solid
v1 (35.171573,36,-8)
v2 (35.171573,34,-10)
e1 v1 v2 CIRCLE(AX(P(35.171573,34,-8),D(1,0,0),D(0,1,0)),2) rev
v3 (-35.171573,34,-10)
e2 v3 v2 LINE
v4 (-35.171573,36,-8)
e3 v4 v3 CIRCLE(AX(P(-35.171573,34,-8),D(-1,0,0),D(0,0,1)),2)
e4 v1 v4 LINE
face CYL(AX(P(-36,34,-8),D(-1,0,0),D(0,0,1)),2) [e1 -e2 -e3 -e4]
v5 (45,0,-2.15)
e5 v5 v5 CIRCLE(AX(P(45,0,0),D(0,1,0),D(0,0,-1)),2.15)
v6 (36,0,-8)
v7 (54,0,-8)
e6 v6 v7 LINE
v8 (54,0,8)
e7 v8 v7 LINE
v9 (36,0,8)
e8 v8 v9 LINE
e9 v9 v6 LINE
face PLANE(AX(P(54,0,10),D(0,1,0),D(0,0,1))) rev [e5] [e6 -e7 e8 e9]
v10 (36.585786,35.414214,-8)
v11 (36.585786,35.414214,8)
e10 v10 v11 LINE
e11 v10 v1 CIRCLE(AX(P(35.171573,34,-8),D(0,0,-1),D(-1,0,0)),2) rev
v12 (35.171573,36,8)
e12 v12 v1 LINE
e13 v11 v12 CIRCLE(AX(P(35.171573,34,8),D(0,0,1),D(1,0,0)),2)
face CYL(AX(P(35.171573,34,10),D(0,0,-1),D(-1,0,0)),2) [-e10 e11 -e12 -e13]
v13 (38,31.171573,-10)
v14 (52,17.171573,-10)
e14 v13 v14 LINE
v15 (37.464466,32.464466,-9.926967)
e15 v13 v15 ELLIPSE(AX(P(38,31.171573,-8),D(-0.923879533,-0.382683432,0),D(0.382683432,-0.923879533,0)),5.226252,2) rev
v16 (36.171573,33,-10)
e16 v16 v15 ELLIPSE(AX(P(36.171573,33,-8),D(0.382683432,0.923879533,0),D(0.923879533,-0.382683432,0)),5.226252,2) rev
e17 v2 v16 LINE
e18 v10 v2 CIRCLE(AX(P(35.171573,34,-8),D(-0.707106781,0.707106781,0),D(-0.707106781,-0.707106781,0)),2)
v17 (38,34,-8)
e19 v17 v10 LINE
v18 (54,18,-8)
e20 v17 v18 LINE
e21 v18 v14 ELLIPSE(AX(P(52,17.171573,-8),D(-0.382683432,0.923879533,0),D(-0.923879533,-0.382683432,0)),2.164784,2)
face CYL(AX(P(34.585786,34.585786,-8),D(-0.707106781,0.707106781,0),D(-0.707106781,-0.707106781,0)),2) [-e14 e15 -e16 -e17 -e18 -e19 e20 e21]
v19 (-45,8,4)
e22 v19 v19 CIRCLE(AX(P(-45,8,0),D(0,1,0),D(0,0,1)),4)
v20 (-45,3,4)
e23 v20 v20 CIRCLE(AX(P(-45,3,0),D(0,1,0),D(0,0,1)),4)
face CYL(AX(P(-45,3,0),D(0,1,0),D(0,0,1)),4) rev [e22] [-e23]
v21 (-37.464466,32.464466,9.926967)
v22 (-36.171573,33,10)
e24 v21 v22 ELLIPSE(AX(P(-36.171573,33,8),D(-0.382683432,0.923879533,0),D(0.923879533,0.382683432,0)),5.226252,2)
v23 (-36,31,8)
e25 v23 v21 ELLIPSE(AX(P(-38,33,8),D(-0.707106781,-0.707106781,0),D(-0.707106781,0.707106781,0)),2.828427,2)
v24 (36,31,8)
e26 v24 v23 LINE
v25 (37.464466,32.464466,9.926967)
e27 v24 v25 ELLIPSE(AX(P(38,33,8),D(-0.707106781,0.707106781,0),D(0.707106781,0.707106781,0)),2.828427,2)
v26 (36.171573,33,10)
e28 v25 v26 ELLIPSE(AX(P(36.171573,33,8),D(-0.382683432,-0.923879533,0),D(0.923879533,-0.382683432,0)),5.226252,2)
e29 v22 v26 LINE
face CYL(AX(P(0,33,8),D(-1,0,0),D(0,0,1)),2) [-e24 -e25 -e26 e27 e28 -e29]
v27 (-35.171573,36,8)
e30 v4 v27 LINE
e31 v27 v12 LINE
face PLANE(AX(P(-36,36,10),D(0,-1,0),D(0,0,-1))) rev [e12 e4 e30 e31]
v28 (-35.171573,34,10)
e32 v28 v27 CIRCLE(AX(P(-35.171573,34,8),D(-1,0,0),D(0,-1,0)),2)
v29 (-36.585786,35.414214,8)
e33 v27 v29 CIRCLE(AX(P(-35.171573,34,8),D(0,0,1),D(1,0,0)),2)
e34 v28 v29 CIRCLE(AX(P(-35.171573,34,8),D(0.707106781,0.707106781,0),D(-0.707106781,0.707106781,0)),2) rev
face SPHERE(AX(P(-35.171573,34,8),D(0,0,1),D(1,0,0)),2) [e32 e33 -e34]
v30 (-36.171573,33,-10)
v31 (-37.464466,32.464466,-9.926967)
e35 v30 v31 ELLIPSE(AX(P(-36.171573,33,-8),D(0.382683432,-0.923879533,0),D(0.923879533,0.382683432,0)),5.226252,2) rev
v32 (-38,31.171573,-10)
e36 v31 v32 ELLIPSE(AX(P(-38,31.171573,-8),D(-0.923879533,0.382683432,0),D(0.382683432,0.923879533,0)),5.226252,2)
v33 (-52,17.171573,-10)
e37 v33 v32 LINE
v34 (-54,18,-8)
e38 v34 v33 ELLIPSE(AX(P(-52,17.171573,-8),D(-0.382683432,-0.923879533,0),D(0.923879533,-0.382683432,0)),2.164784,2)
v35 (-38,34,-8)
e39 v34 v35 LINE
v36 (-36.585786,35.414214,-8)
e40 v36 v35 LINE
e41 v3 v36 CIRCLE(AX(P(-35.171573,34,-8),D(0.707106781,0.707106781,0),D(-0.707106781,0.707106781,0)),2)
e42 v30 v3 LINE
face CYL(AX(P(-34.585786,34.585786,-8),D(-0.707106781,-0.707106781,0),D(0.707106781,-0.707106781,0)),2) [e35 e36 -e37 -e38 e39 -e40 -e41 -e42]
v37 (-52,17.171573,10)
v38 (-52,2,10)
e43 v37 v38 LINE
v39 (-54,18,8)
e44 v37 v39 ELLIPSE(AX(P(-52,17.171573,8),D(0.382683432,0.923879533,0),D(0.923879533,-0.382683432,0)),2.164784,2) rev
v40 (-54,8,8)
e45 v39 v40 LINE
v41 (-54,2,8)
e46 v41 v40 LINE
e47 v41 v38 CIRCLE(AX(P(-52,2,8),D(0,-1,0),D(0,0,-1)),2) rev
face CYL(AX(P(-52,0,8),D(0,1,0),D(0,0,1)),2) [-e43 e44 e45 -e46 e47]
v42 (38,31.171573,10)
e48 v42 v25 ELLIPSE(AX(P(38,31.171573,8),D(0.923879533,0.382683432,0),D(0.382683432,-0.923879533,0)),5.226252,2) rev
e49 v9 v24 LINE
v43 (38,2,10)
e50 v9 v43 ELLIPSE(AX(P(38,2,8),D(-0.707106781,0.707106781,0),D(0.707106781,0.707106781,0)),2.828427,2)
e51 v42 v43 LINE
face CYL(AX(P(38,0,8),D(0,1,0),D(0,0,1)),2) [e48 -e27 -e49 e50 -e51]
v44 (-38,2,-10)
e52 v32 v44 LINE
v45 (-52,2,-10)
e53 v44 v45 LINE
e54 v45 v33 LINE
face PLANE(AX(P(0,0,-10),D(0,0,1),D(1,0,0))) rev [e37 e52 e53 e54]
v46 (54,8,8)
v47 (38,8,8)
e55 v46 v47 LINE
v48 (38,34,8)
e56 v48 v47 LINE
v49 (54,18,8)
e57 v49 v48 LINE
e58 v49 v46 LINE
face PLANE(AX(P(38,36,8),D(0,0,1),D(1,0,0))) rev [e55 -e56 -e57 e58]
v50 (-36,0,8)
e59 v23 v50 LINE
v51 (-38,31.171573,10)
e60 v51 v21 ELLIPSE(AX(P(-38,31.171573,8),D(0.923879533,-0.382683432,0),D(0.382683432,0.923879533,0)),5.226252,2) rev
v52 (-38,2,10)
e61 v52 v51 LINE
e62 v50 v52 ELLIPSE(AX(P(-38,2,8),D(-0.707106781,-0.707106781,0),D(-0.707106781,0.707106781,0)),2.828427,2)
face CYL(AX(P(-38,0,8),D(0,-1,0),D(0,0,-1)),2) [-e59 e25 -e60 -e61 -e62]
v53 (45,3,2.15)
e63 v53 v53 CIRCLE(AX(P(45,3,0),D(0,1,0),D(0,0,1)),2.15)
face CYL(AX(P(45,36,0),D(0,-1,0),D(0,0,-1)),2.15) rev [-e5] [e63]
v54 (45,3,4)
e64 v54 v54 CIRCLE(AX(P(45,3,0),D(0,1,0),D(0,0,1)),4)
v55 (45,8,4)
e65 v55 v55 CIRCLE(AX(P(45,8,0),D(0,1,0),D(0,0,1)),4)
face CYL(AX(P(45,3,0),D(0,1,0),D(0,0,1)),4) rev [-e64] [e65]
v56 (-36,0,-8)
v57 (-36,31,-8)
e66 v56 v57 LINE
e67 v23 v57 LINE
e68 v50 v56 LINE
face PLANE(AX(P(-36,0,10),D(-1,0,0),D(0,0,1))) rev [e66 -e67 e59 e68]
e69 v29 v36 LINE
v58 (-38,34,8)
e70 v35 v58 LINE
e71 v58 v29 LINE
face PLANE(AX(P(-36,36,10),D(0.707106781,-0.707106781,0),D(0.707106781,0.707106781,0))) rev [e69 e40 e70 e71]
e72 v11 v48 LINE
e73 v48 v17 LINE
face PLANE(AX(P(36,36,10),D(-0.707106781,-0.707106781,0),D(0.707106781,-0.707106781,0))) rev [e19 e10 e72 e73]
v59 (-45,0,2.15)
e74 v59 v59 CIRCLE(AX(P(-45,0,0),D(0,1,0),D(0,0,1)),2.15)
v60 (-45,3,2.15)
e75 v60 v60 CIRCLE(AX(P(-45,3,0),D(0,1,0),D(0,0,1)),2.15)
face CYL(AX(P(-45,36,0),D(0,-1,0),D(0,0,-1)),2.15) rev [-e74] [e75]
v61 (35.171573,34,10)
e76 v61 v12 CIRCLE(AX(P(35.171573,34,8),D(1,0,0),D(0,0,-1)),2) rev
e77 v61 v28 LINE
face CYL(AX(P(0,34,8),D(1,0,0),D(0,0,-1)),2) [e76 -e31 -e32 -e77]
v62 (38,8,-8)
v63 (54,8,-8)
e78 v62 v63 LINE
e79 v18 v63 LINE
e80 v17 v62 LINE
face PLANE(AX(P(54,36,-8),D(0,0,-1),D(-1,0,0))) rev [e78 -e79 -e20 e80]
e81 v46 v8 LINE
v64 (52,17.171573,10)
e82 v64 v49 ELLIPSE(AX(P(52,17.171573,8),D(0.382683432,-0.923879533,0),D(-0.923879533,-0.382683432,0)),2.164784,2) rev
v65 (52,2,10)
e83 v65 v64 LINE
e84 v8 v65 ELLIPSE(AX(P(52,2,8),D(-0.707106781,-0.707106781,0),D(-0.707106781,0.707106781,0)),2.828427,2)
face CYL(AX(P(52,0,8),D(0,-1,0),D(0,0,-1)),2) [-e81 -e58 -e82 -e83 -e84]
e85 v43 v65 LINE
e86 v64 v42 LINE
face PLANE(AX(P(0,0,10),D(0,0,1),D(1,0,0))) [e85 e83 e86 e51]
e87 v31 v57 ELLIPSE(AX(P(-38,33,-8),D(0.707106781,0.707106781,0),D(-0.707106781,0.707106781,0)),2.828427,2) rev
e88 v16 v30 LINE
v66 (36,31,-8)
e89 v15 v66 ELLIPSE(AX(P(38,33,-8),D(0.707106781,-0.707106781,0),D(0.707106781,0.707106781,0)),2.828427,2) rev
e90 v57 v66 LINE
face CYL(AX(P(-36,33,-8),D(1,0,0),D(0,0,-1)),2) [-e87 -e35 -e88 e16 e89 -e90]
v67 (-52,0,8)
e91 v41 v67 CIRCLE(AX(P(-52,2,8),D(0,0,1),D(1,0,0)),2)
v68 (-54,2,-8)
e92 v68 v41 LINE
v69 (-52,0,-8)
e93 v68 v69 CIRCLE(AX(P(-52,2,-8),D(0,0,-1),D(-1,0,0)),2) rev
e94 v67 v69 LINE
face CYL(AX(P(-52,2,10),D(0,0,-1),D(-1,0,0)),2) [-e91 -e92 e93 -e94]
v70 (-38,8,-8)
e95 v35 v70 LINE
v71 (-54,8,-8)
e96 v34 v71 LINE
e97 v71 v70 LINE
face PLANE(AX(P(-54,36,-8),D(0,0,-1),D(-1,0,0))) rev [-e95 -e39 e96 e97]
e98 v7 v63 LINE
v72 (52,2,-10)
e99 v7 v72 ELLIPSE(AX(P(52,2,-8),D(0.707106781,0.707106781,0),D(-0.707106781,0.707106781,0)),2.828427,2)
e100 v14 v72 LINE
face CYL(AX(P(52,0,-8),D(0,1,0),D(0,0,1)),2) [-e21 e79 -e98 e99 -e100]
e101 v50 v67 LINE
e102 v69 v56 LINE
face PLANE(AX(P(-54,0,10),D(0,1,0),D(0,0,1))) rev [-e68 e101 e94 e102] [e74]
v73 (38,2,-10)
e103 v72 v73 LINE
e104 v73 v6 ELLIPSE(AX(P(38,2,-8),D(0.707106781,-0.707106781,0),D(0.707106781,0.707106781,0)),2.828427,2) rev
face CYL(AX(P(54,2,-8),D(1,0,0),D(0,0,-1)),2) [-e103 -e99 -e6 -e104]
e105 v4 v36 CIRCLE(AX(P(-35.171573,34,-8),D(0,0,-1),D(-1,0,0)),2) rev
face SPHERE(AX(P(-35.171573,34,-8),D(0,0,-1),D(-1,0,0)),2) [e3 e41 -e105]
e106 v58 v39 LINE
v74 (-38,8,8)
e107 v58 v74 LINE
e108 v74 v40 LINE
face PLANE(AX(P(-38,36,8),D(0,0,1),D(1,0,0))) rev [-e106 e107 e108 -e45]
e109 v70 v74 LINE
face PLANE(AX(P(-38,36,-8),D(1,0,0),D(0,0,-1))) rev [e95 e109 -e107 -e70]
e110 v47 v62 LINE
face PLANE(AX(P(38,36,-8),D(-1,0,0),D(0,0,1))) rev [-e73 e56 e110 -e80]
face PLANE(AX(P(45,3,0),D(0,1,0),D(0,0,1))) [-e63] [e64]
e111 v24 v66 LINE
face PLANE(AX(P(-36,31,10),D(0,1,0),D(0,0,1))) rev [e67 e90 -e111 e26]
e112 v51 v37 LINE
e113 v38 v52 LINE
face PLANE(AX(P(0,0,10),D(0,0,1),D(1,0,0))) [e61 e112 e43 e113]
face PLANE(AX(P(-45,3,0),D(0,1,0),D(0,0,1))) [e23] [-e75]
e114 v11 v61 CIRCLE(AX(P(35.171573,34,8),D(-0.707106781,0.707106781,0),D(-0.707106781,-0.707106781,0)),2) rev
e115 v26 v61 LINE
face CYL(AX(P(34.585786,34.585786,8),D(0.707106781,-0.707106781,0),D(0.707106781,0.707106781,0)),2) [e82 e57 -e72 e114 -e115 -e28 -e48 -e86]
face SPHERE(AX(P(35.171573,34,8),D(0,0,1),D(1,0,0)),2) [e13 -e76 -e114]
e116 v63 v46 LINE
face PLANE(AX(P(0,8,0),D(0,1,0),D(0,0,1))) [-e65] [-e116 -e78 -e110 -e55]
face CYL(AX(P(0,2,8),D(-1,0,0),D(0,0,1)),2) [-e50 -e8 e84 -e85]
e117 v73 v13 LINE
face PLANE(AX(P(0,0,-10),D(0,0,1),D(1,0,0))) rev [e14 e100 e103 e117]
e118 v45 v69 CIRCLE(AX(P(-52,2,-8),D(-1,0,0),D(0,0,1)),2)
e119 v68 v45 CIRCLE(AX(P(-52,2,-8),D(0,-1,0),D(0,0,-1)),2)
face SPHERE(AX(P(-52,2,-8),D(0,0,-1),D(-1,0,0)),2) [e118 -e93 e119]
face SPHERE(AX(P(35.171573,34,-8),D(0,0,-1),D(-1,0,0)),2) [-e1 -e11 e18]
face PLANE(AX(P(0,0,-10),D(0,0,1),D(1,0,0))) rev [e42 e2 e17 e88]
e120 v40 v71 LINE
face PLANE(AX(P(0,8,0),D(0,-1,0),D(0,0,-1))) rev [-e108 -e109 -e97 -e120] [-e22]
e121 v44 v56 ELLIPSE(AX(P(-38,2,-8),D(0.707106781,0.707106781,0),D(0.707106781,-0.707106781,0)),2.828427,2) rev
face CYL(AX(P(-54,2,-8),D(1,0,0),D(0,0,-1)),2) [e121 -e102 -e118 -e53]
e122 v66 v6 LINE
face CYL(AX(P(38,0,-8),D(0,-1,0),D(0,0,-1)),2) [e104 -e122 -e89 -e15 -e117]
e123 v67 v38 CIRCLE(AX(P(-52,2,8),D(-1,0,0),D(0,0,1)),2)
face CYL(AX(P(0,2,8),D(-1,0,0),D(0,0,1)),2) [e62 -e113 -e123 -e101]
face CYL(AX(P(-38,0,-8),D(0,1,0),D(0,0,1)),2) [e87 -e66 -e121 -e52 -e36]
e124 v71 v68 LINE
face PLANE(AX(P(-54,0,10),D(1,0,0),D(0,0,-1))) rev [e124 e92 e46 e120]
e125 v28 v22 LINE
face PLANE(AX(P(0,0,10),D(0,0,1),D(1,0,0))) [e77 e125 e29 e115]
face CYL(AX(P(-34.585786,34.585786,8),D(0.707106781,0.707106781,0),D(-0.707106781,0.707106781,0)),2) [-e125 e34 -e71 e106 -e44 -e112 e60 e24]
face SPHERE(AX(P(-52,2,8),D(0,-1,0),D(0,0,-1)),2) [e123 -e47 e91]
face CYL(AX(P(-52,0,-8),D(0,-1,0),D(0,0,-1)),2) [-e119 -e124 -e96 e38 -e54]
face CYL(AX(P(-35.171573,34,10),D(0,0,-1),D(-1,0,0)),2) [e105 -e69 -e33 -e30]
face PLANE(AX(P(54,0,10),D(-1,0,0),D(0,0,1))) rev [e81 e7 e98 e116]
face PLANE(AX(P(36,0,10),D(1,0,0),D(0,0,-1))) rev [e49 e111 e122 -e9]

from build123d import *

# Parameters (mm, degrees)
EXTRUDE_1_DEPTH     = 10
SKETCH_2_R          = 2.15
CUT_EXTRUDE_1_DEPTH = 66.665820638
CUT_EXTRUDE_START   = -8
SKETCH_3_W          = 16
SKETCH_3_H          = 16
CUT_EXTRUDE_2_DEPTH = 58.665820638
SKETCH_4_R          = 4
CUT_EXTRUDE_3_DEPTH = 5
FILLET_1_R          = 2


with BuildPart() as part:
    # 草图1 → 凸台-拉伸1 (new, symmetric)
    with BuildSketch(Plane.XY):
        Polygon((-54, 0), (-54, 18), (-36, 36), (36, 36), (54, 18), (54, 0), (36, 0), (36, 31), (-36, 31), (-36, 0), align=None)
    extrude(amount=EXTRUDE_1_DEPTH, both=True)

    # 草图2 → 切除-拉伸1 (cut, through all)
    with BuildSketch(Plane(origin=(0, 0, 0), x_dir=(1, 0, 0), z_dir=(0, 1, 0))):
        with Locations(Location((-45, 0, 0), (0, 0, 180))):
            Circle(SKETCH_2_R)
        with Locations(Location((45, 0, 0), (0, 0, 90))):
            Circle(SKETCH_2_R)
    extrude(amount=CUT_EXTRUDE_1_DEPTH, mode=Mode.SUBTRACT)

    # 草图3 → 切除-拉伸2 (cut, through all)
    with BuildSketch(Plane.XZ.offset(CUT_EXTRUDE_START)):
        with Locations((-46, 0)):
            Rectangle(SKETCH_3_W, SKETCH_3_H)
        with Locations((46, 0)):
            Rectangle(SKETCH_3_W, SKETCH_3_H)
    extrude(amount=-CUT_EXTRUDE_2_DEPTH, mode=Mode.SUBTRACT)

    # 草图4 → 切除-拉伸3 (cut)
    with BuildSketch(Plane(origin=(0, 8, 0), x_dir=(1, 0, 0), z_dir=(0, 1, 0))):
        with Locations(Location((45, 0, 0), (0, 0, 270))):
            Circle(SKETCH_4_R)
        with Locations(Location((-45, 0, 0), (0, 0, 270))):
            Circle(SKETCH_4_R)
    extrude(amount=-CUT_EXTRUDE_3_DEPTH, mode=Mode.SUBTRACT)

    # 圆角1
    # the kernel refuses this fillet: 2 mm, written as the material it takes off along each edge
    with BuildSketch(Plane(origin=(-52, 2, 8), x_dir=(0, -1, 0), z_dir=(-1, 0, 0))) as fillet_1_piece_1_section:
        Polygon((0, 0), (FILLET_1_R, 0), (FILLET_1_R, FILLET_1_R), (0, FILLET_1_R), align=None)
    fillet_1_piece_1 = extrude(amount=FILLET_1_R, mode=Mode.PRIVATE)
    fillet_1_piece_1 = fillet_1_piece_1 - Plane(origin=(-52, 2, 8), x_dir=(0, 0.7071067811865475, -0.7071067811865475), z_dir=(-1, 0, 0)) * Sphere(FILLET_1_R, mode=Mode.PRIVATE)
    add(fillet_1_piece_1, mode=Mode.SUBTRACT)
    with BuildSketch(Plane(origin=(-35.171572875, 34, 8), x_dir=(-0.7071067811865515, 0.7071067811865437, 0), z_dir=(0, 0, 1))) as fillet_1_piece_2_section:
        Polygon((0, 0), (FILLET_1_R, 0), (FILLET_1_R, -FILLET_1_R * 0.414213562373), (FILLET_1_R * 0.707106781187, -FILLET_1_R * 0.707106781187), align=None)
    fillet_1_piece_2 = extrude(amount=FILLET_1_R, mode=Mode.PRIVATE)
    fillet_1_piece_2 = fillet_1_piece_2 - Plane(origin=(-35.171572875, 34, 8), x_dir=(0.38268343236509234, -0.9238795325112857, 0), z_dir=(0, 0, 1)) * Sphere(FILLET_1_R, mode=Mode.PRIVATE)
    add(fillet_1_piece_2, mode=Mode.SUBTRACT)
    with BuildSketch(Plane(origin=(35.171572875, 34, 8), x_dir=(0.7071067811865515, 0.7071067811865437, 0), z_dir=(0, 0, 1))) as fillet_1_piece_3_section:
        Polygon((0, 0), (FILLET_1_R, 0), (FILLET_1_R, FILLET_1_R * 0.414213562373), (FILLET_1_R * 0.707106781187, FILLET_1_R * 0.707106781187), align=None)
    fillet_1_piece_3 = extrude(amount=FILLET_1_R, mode=Mode.PRIVATE)
    fillet_1_piece_3 = fillet_1_piece_3 - Plane(origin=(35.171572875, 34, 8), x_dir=(-0.38268343236509234, -0.9238795325112857, 0), z_dir=(0, 0, 1)) * Sphere(FILLET_1_R, mode=Mode.PRIVATE)
    add(fillet_1_piece_3, mode=Mode.SUBTRACT)
    with BuildSketch(Plane(origin=(35.171572875, 34, -8), x_dir=(0, 1, 0), z_dir=(0, 0, -1))) as fillet_1_piece_4_section:
        Polygon((0, 0), (FILLET_1_R, 0), (FILLET_1_R, FILLET_1_R * 0.414213562373), (FILLET_1_R * 0.707106781187, FILLET_1_R * 0.707106781187), align=None)
    fillet_1_piece_4 = extrude(amount=FILLET_1_R, mode=Mode.PRIVATE)
    fillet_1_piece_4 = fillet_1_piece_4 - Plane(origin=(35.171572875, 34, -8), x_dir=(-0.38268343236509234, -0.9238795325112857, 0), z_dir=(0, 0, -1)) * Sphere(FILLET_1_R, mode=Mode.PRIVATE)
    add(fillet_1_piece_4, mode=Mode.SUBTRACT)
    with BuildSketch(Plane(origin=(-35.171572875, 34, -8), x_dir=(0, 1, 0), z_dir=(0, 0, -1))) as fillet_1_piece_5_section:
        Polygon((0, 0), (FILLET_1_R, 0), (FILLET_1_R, -FILLET_1_R * 0.414213562373), (FILLET_1_R * 0.707106781187, -FILLET_1_R * 0.707106781187), align=None)
    fillet_1_piece_5 = extrude(amount=FILLET_1_R, mode=Mode.PRIVATE)
    fillet_1_piece_5 = fillet_1_piece_5 - Plane(origin=(-35.171572875, 34, -8), x_dir=(0.38268343236509234, -0.9238795325112857, 0), z_dir=(0, 0, -1)) * Sphere(FILLET_1_R, mode=Mode.PRIVATE)
    add(fillet_1_piece_5, mode=Mode.SUBTRACT)
    with BuildSketch(Plane(origin=(-52, 2, -8), x_dir=(0, -1, 0), z_dir=(-1, 0, 0))) as fillet_1_piece_6_section:
        Polygon((0, 0), (FILLET_1_R, 0), (FILLET_1_R, -FILLET_1_R), (0, -FILLET_1_R), align=None)
    fillet_1_piece_6 = extrude(amount=FILLET_1_R, mode=Mode.PRIVATE)
    fillet_1_piece_6 = fillet_1_piece_6 - Plane(origin=(-52, 2, -8), x_dir=(0, 0.7071067811865475, 0.7071067811865475), z_dir=(-1, 0, 0)) * Sphere(FILLET_1_R, mode=Mode.PRIVATE)
    add(fillet_1_piece_6, mode=Mode.SUBTRACT)
    with BuildSketch(Plane(origin=(-54, 2, 10), x_dir=(0, 0, -1), z_dir=(0, 1, 0)), Plane(origin=(-31, 0, 10), x_dir=(0, 0, -1), z_dir=(-1, 0, 0))) as fillet_1_piece_7:
        with BuildLine():
            CenterArc((FILLET_1_R, -FILLET_1_R), FILLET_1_R, 90, 90)
            Line((0, -FILLET_1_R), (0, 0))
            Line((0, 0), (FILLET_1_R, 0))
        make_face()
    extrude(amount=21, mode=Mode.SUBTRACT)
    with BuildSketch(Plane(origin=(-57.535533906, 14.464466094, 10), x_dir=(0.7071067811865515, -0.7071067811865437, 0), z_dir=(0.7071067811865437, 0.7071067811865515, 0)), Plane(origin=(36.585786438, 35.414213562, 10), x_dir=(-0.7071067811865515, -0.7071067811865437, 0), z_dir=(0.7071067811865437, -0.7071067811865515, 0)), Plane(origin=(-57.535533906, 14.464466094, -10), x_dir=(0, 0, 1), z_dir=(0.7071067811865437, 0.7071067811865515, 0))) as fillet_1_piece_8:
        with BuildLine():
            CenterArc((FILLET_1_R, FILLET_1_R), FILLET_1_R, 180, 90)
            Line((0, FILLET_1_R), (0, 0))
            Line((0, 0), (FILLET_1_R, 0))
        make_face()
    extrude(amount=29.627416998, mode=Mode.SUBTRACT)
    with BuildSketch(Plane(origin=(54, 23, 10), x_dir=(-1, 0, 0), z_dir=(0, -1, 0)), Plane(origin=(59, 0, 10), x_dir=(0, 1, 0), z_dir=(-1, 0, 0))) as fillet_1_piece_9:
        with BuildLine():
            CenterArc((FILLET_1_R, FILLET_1_R), FILLET_1_R, 180, 90)
            Line((0, FILLET_1_R), (0, 0))
            Line((0, 0), (FILLET_1_R, 0))
        make_face()
    extrude(amount=28, mode=Mode.SUBTRACT)
    with BuildSketch(Plane(origin=(36, -5, 10), x_dir=(1, 0, 0), z_dir=(0, 1, 0)), Plane(origin=(-36, 31, 10), x_dir=(-1, 0, 0), z_dir=(0, -1, 0))) as fillet_1_piece_10:
        with BuildLine():
            CenterArc((FILLET_1_R, FILLET_1_R), FILLET_1_R, 180, 90)
            Line((0, FILLET_1_R), (0, 0))
            Line((0, 0), (FILLET_1_R, 0))
        make_face()
    extrude(amount=36, mode=Mode.SUBTRACT)
    with BuildSketch(Plane(origin=(36, 31, 10), x_dir=(0, 1, 0), z_dir=(-1, 0, 0))) as fillet_1_piece_11:
        with BuildLine():
            CenterArc((FILLET_1_R, FILLET_1_R), FILLET_1_R, 180, 90)
            Line((0, FILLET_1_R), (0, 0))
            Line((0, 0), (FILLET_1_R, 0))
        make_face()
    extrude(amount=72, mode=Mode.SUBTRACT)
    with BuildSketch(Plane(origin=(-36, 31, -10), x_dir=(-1, 0, 0), z_dir=(0, -1, 0)), Plane(origin=(36, -5, -10), x_dir=(1, 0, 0), z_dir=(0, 1, 0))) as fillet_1_piece_12:
        with BuildLine():
            CenterArc((FILLET_1_R, -FILLET_1_R), FILLET_1_R, 90, 90)
            Line((0, -FILLET_1_R), (0, 0))
            Line((0, 0), (FILLET_1_R, 0))
        make_face()
    extrude(amount=36, mode=Mode.SUBTRACT)
    with BuildSketch(Plane(origin=(36, 31, -10), x_dir=(0, 1, 0), z_dir=(-1, 0, 0))) as fillet_1_piece_13:
        with BuildLine():
            CenterArc((FILLET_1_R, -FILLET_1_R), FILLET_1_R, 90, 90)
            Line((0, -FILLET_1_R), (0, 0))
            Line((0, 0), (FILLET_1_R, 0))
        make_face()
    extrude(amount=72, mode=Mode.SUBTRACT)
    with BuildSketch(Plane(origin=(59, 0, -10), x_dir=(0, 1, 0), z_dir=(-1, 0, 0)), Plane(origin=(54, 23, -10), x_dir=(-1, 0, 0), z_dir=(0, -1, 0))) as fillet_1_piece_14:
        with BuildLine():
            CenterArc((FILLET_1_R, -FILLET_1_R), FILLET_1_R, 90, 90)
            Line((0, -FILLET_1_R), (0, 0))
            Line((0, 0), (FILLET_1_R, 0))
        make_face()
    extrude(amount=28, mode=Mode.SUBTRACT)
    with BuildSketch(Plane(origin=(36.585786438, 35.414213562, -10), x_dir=(-0.7071067811865515, -0.7071067811865437, 0), z_dir=(0.7071067811865437, -0.7071067811865515, 0))) as fillet_1_piece_15:
        with BuildLine():
            CenterArc((FILLET_1_R, -FILLET_1_R), FILLET_1_R, 90, 90)
            Line((0, -FILLET_1_R), (0, 0))
            Line((0, 0), (FILLET_1_R, 0))
        make_face()
    extrude(amount=29.627416998, mode=Mode.SUBTRACT)
    with BuildSketch(Plane(origin=(-54, 2, -10), x_dir=(0, 0, 1), z_dir=(0, 1, 0)), Plane(origin=(-31, 0, -10), x_dir=(0, 0, 1), z_dir=(-1, 0, 0))) as fillet_1_piece_16:
        with BuildLine():
            CenterArc((FILLET_1_R, FILLET_1_R), FILLET_1_R, 180, 90)
            Line((0, FILLET_1_R), (0, 0))
            Line((0, 0), (FILLET_1_R, 0))
        make_face()
    extrude(amount=21, mode=Mode.SUBTRACT)
    with BuildSketch(Plane(origin=(36, 36, 8), x_dir=(-1, 0, 0), z_dir=(0, 0, -1)), Plane(origin=(-36, 36, 8), x_dir=(-0.7071067811865432, -0.7071067811865518, 0), z_dir=(0, 0, -1))) as fillet_1_piece_17:
        with BuildLine():
            CenterArc((FILLET_1_R * 0.414213562373, -FILLET_1_R), FILLET_1_R, 90, 45)
            Line((-FILLET_1_R * 0.292893218813, -FILLET_1_R * 0.292893218813), (0, 0))
            Line((0, 0), (FILLET_1_R * 0.414213562373, 0))
        make_face()
    extrude(amount=16, mode=Mode.SUBTRACT)
    with BuildSketch(Plane(origin=(-35.171572875, 36, 10), x_dir=(0, -1, 0), z_dir=(1, 0, 0))) as fillet_1_piece_18:
        with BuildLine():
            CenterArc((FILLET_1_R, FILLET_1_R), FILLET_1_R, 180, 90)
            Line((0, FILLET_1_R), (0, 0))
            Line((0, 0), (FILLET_1_R, 0))
        make_face()
    extrude(amount=70.343145751, mode=Mode.SUBTRACT)
    with BuildSketch(Plane(origin=(-35.171572875, 36, -10), x_dir=(0, -1, 0), z_dir=(1, 0, 0))) as fillet_1_piece_19:
        with BuildLine():
            CenterArc((FILLET_1_R, -FILLET_1_R), FILLET_1_R, 90, 90)
            Line((0, -FILLET_1_R), (0, 0))
            Line((0, 0), (FILLET_1_R, 0))
        make_face()
    extrude(amount=70.343145751, mode=Mode.SUBTRACT)
    with BuildSketch(Plane(origin=(-54, 0, -8), x_dir=(0, 1, 0), z_dir=(0, 0, 1))) as fillet_1_piece_20:
        with BuildLine():
            CenterArc((FILLET_1_R, -FILLET_1_R), FILLET_1_R, 90, 90)
            Line((0, -FILLET_1_R), (0, 0))
            Line((0, 0), (FILLET_1_R, 0))
        make_face()
    extrude(amount=16, mode=Mode.SUBTRACT)
    with BuildSketch(Plane(origin=(36, -5, 10), x_dir=(1, 0, 0), z_dir=(0, 1, 0))) as fillet_1_piece_21a_section:
        with BuildLine():
            CenterArc((FILLET_1_R, FILLET_1_R), FILLET_1_R, 180, 90)
            Line((0, FILLET_1_R), (0, 0))
            Line((0, 0), (FILLET_1_R, 0))
        make_face()
    fillet_1_piece_21a = extrude(amount=41, mode=Mode.PRIVATE)
    fillet_1_piece_21a = split(fillet_1_piece_21a, bisect_by=Plane(origin=(36.452790229, 31, 9.547209771), z_dir=(0, 1, 0)), keep=Keep.TOP, mode=Mode.PRIVATE)
    with BuildSketch(Plane(origin=(41, 31, 10), x_dir=(0, 1, 0), z_dir=(-1, 0, 0))) as fillet_1_piece_21b_section:
        with BuildLine():
            CenterArc((FILLET_1_R, FILLET_1_R), FILLET_1_R, 180, 90)
            Line((0, FILLET_1_R), (0, 0))
            Line((0, 0), (FILLET_1_R, 0))
        make_face()
    fillet_1_piece_21b = extrude(amount=77, mode=Mode.PRIVATE)
    fillet_1_piece_21b = split(fillet_1_piece_21b, bisect_by=Plane(origin=(36, 31.452790229, 9.547209771), z_dir=(1, 0, 0)), keep=Keep.TOP, mode=Mode.PRIVATE)
    fillet_1_piece_21 = fillet_1_piece_21a & fillet_1_piece_21b
    add(fillet_1_piece_21, mode=Mode.SUBTRACT)
    with BuildSketch(Plane(origin=(36, 31, 10), x_dir=(0, 1, 0), z_dir=(-1, 0, 0))) as fillet_1_piece_22a_section:
        with BuildLine():
            CenterArc((FILLET_1_R, FILLET_1_R), FILLET_1_R, 180, 90)
            Line((0, FILLET_1_R), (0, 0))
            Line((0, 0), (FILLET_1_R, 0))
        make_face()
    fillet_1_piece_22a = extrude(amount=77, mode=Mode.PRIVATE)
    fillet_1_piece_22a = split(fillet_1_piece_22a, bisect_by=Plane(origin=(-36, 31.452790229, 9.547209771), z_dir=(-1, 0, 0)), keep=Keep.TOP, mode=Mode.PRIVATE)
    with BuildSketch(Plane(origin=(-36, 36, 10), x_dir=(-1, 0, 0), z_dir=(0, -1, 0))) as fillet_1_piece_22b_section:
        with BuildLine():
            CenterArc((FILLET_1_R, FILLET_1_R), FILLET_1_R, 180, 90)
            Line((0, FILLET_1_R), (0, 0))
            Line((0, 0), (FILLET_1_R, 0))
        make_face()
    fillet_1_piece_22b = extrude(amount=41, mode=Mode.PRIVATE)
    fillet_1_piece_22b = split(fillet_1_piece_22b, bisect_by=Plane(origin=(-36.452790229, 31, 9.547209771), z_dir=(0, 1, 0)), keep=Keep.TOP, mode=Mode.PRIVATE)
    fillet_1_piece_22 = fillet_1_piece_22a & fillet_1_piece_22b
    add(fillet_1_piece_22, mode=Mode.SUBTRACT)
    with BuildSketch(Plane(origin=(36, 31, -10), x_dir=(0, 1, 0), z_dir=(-1, 0, 0))) as fillet_1_piece_23a_section:
        with BuildLine():
            CenterArc((FILLET_1_R, -FILLET_1_R), FILLET_1_R, 90, 90)
            Line((0, -FILLET_1_R), (0, 0))
            Line((0, 0), (FILLET_1_R, 0))
        make_face()
    fillet_1_piece_23a = extrude(amount=77, mode=Mode.PRIVATE)
    fillet_1_piece_23a = split(fillet_1_piece_23a, bisect_by=Plane(origin=(-36, 31.452790229, -9.547209771), z_dir=(-1, 0, 0)), keep=Keep.TOP, mode=Mode.PRIVATE)
    with BuildSketch(Plane(origin=(-36, 36, -10), x_dir=(-1, 0, 0), z_dir=(0, -1, 0))) as fillet_1_piece_23b_section:
        with BuildLine():
            CenterArc((FILLET_1_R, -FILLET_1_R), FILLET_1_R, 90, 90)
            Line((0, -FILLET_1_R), (0, 0))
            Line((0, 0), (FILLET_1_R, 0))
        make_face()
    fillet_1_piece_23b = extrude(amount=41, mode=Mode.PRIVATE)
    fillet_1_piece_23b = split(fillet_1_piece_23b, bisect_by=Plane(origin=(-36.452790229, 31, -9.547209771), z_dir=(0, 1, 0)), keep=Keep.TOP, mode=Mode.PRIVATE)
    fillet_1_piece_23 = fillet_1_piece_23a & fillet_1_piece_23b
    add(fillet_1_piece_23, mode=Mode.SUBTRACT)
    with BuildSketch(Plane(origin=(36, -5, -10), x_dir=(1, 0, 0), z_dir=(0, 1, 0))) as fillet_1_piece_24a_section:
        with BuildLine():
            CenterArc((FILLET_1_R, -FILLET_1_R), FILLET_1_R, 90, 90)
            Line((0, -FILLET_1_R), (0, 0))
            Line((0, 0), (FILLET_1_R, 0))
        make_face()
    fillet_1_piece_24a = extrude(amount=41, mode=Mode.PRIVATE)
    fillet_1_piece_24a = split(fillet_1_piece_24a, bisect_by=Plane(origin=(36.452790229, 31, -9.547209771), z_dir=(0, 1, 0)), keep=Keep.TOP, mode=Mode.PRIVATE)
    with BuildSketch(Plane(origin=(41, 31, -10), x_dir=(0, 1, 0), z_dir=(-1, 0, 0))) as fillet_1_piece_24b_section:
        with BuildLine():
            CenterArc((FILLET_1_R, -FILLET_1_R), FILLET_1_R, 90, 90)
            Line((0, -FILLET_1_R), (0, 0))
            Line((0, 0), (FILLET_1_R, 0))
        make_face()
    fillet_1_piece_24b = extrude(amount=77, mode=Mode.PRIVATE)
    fillet_1_piece_24b = split(fillet_1_piece_24b, bisect_by=Plane(origin=(36, 31.452790229, -9.547209771), z_dir=(1, 0, 0)), keep=Keep.TOP, mode=Mode.PRIVATE)
    fillet_1_piece_24 = fillet_1_piece_24a & fillet_1_piece_24b
    add(fillet_1_piece_24, mode=Mode.SUBTRACT)


solid = part.part
